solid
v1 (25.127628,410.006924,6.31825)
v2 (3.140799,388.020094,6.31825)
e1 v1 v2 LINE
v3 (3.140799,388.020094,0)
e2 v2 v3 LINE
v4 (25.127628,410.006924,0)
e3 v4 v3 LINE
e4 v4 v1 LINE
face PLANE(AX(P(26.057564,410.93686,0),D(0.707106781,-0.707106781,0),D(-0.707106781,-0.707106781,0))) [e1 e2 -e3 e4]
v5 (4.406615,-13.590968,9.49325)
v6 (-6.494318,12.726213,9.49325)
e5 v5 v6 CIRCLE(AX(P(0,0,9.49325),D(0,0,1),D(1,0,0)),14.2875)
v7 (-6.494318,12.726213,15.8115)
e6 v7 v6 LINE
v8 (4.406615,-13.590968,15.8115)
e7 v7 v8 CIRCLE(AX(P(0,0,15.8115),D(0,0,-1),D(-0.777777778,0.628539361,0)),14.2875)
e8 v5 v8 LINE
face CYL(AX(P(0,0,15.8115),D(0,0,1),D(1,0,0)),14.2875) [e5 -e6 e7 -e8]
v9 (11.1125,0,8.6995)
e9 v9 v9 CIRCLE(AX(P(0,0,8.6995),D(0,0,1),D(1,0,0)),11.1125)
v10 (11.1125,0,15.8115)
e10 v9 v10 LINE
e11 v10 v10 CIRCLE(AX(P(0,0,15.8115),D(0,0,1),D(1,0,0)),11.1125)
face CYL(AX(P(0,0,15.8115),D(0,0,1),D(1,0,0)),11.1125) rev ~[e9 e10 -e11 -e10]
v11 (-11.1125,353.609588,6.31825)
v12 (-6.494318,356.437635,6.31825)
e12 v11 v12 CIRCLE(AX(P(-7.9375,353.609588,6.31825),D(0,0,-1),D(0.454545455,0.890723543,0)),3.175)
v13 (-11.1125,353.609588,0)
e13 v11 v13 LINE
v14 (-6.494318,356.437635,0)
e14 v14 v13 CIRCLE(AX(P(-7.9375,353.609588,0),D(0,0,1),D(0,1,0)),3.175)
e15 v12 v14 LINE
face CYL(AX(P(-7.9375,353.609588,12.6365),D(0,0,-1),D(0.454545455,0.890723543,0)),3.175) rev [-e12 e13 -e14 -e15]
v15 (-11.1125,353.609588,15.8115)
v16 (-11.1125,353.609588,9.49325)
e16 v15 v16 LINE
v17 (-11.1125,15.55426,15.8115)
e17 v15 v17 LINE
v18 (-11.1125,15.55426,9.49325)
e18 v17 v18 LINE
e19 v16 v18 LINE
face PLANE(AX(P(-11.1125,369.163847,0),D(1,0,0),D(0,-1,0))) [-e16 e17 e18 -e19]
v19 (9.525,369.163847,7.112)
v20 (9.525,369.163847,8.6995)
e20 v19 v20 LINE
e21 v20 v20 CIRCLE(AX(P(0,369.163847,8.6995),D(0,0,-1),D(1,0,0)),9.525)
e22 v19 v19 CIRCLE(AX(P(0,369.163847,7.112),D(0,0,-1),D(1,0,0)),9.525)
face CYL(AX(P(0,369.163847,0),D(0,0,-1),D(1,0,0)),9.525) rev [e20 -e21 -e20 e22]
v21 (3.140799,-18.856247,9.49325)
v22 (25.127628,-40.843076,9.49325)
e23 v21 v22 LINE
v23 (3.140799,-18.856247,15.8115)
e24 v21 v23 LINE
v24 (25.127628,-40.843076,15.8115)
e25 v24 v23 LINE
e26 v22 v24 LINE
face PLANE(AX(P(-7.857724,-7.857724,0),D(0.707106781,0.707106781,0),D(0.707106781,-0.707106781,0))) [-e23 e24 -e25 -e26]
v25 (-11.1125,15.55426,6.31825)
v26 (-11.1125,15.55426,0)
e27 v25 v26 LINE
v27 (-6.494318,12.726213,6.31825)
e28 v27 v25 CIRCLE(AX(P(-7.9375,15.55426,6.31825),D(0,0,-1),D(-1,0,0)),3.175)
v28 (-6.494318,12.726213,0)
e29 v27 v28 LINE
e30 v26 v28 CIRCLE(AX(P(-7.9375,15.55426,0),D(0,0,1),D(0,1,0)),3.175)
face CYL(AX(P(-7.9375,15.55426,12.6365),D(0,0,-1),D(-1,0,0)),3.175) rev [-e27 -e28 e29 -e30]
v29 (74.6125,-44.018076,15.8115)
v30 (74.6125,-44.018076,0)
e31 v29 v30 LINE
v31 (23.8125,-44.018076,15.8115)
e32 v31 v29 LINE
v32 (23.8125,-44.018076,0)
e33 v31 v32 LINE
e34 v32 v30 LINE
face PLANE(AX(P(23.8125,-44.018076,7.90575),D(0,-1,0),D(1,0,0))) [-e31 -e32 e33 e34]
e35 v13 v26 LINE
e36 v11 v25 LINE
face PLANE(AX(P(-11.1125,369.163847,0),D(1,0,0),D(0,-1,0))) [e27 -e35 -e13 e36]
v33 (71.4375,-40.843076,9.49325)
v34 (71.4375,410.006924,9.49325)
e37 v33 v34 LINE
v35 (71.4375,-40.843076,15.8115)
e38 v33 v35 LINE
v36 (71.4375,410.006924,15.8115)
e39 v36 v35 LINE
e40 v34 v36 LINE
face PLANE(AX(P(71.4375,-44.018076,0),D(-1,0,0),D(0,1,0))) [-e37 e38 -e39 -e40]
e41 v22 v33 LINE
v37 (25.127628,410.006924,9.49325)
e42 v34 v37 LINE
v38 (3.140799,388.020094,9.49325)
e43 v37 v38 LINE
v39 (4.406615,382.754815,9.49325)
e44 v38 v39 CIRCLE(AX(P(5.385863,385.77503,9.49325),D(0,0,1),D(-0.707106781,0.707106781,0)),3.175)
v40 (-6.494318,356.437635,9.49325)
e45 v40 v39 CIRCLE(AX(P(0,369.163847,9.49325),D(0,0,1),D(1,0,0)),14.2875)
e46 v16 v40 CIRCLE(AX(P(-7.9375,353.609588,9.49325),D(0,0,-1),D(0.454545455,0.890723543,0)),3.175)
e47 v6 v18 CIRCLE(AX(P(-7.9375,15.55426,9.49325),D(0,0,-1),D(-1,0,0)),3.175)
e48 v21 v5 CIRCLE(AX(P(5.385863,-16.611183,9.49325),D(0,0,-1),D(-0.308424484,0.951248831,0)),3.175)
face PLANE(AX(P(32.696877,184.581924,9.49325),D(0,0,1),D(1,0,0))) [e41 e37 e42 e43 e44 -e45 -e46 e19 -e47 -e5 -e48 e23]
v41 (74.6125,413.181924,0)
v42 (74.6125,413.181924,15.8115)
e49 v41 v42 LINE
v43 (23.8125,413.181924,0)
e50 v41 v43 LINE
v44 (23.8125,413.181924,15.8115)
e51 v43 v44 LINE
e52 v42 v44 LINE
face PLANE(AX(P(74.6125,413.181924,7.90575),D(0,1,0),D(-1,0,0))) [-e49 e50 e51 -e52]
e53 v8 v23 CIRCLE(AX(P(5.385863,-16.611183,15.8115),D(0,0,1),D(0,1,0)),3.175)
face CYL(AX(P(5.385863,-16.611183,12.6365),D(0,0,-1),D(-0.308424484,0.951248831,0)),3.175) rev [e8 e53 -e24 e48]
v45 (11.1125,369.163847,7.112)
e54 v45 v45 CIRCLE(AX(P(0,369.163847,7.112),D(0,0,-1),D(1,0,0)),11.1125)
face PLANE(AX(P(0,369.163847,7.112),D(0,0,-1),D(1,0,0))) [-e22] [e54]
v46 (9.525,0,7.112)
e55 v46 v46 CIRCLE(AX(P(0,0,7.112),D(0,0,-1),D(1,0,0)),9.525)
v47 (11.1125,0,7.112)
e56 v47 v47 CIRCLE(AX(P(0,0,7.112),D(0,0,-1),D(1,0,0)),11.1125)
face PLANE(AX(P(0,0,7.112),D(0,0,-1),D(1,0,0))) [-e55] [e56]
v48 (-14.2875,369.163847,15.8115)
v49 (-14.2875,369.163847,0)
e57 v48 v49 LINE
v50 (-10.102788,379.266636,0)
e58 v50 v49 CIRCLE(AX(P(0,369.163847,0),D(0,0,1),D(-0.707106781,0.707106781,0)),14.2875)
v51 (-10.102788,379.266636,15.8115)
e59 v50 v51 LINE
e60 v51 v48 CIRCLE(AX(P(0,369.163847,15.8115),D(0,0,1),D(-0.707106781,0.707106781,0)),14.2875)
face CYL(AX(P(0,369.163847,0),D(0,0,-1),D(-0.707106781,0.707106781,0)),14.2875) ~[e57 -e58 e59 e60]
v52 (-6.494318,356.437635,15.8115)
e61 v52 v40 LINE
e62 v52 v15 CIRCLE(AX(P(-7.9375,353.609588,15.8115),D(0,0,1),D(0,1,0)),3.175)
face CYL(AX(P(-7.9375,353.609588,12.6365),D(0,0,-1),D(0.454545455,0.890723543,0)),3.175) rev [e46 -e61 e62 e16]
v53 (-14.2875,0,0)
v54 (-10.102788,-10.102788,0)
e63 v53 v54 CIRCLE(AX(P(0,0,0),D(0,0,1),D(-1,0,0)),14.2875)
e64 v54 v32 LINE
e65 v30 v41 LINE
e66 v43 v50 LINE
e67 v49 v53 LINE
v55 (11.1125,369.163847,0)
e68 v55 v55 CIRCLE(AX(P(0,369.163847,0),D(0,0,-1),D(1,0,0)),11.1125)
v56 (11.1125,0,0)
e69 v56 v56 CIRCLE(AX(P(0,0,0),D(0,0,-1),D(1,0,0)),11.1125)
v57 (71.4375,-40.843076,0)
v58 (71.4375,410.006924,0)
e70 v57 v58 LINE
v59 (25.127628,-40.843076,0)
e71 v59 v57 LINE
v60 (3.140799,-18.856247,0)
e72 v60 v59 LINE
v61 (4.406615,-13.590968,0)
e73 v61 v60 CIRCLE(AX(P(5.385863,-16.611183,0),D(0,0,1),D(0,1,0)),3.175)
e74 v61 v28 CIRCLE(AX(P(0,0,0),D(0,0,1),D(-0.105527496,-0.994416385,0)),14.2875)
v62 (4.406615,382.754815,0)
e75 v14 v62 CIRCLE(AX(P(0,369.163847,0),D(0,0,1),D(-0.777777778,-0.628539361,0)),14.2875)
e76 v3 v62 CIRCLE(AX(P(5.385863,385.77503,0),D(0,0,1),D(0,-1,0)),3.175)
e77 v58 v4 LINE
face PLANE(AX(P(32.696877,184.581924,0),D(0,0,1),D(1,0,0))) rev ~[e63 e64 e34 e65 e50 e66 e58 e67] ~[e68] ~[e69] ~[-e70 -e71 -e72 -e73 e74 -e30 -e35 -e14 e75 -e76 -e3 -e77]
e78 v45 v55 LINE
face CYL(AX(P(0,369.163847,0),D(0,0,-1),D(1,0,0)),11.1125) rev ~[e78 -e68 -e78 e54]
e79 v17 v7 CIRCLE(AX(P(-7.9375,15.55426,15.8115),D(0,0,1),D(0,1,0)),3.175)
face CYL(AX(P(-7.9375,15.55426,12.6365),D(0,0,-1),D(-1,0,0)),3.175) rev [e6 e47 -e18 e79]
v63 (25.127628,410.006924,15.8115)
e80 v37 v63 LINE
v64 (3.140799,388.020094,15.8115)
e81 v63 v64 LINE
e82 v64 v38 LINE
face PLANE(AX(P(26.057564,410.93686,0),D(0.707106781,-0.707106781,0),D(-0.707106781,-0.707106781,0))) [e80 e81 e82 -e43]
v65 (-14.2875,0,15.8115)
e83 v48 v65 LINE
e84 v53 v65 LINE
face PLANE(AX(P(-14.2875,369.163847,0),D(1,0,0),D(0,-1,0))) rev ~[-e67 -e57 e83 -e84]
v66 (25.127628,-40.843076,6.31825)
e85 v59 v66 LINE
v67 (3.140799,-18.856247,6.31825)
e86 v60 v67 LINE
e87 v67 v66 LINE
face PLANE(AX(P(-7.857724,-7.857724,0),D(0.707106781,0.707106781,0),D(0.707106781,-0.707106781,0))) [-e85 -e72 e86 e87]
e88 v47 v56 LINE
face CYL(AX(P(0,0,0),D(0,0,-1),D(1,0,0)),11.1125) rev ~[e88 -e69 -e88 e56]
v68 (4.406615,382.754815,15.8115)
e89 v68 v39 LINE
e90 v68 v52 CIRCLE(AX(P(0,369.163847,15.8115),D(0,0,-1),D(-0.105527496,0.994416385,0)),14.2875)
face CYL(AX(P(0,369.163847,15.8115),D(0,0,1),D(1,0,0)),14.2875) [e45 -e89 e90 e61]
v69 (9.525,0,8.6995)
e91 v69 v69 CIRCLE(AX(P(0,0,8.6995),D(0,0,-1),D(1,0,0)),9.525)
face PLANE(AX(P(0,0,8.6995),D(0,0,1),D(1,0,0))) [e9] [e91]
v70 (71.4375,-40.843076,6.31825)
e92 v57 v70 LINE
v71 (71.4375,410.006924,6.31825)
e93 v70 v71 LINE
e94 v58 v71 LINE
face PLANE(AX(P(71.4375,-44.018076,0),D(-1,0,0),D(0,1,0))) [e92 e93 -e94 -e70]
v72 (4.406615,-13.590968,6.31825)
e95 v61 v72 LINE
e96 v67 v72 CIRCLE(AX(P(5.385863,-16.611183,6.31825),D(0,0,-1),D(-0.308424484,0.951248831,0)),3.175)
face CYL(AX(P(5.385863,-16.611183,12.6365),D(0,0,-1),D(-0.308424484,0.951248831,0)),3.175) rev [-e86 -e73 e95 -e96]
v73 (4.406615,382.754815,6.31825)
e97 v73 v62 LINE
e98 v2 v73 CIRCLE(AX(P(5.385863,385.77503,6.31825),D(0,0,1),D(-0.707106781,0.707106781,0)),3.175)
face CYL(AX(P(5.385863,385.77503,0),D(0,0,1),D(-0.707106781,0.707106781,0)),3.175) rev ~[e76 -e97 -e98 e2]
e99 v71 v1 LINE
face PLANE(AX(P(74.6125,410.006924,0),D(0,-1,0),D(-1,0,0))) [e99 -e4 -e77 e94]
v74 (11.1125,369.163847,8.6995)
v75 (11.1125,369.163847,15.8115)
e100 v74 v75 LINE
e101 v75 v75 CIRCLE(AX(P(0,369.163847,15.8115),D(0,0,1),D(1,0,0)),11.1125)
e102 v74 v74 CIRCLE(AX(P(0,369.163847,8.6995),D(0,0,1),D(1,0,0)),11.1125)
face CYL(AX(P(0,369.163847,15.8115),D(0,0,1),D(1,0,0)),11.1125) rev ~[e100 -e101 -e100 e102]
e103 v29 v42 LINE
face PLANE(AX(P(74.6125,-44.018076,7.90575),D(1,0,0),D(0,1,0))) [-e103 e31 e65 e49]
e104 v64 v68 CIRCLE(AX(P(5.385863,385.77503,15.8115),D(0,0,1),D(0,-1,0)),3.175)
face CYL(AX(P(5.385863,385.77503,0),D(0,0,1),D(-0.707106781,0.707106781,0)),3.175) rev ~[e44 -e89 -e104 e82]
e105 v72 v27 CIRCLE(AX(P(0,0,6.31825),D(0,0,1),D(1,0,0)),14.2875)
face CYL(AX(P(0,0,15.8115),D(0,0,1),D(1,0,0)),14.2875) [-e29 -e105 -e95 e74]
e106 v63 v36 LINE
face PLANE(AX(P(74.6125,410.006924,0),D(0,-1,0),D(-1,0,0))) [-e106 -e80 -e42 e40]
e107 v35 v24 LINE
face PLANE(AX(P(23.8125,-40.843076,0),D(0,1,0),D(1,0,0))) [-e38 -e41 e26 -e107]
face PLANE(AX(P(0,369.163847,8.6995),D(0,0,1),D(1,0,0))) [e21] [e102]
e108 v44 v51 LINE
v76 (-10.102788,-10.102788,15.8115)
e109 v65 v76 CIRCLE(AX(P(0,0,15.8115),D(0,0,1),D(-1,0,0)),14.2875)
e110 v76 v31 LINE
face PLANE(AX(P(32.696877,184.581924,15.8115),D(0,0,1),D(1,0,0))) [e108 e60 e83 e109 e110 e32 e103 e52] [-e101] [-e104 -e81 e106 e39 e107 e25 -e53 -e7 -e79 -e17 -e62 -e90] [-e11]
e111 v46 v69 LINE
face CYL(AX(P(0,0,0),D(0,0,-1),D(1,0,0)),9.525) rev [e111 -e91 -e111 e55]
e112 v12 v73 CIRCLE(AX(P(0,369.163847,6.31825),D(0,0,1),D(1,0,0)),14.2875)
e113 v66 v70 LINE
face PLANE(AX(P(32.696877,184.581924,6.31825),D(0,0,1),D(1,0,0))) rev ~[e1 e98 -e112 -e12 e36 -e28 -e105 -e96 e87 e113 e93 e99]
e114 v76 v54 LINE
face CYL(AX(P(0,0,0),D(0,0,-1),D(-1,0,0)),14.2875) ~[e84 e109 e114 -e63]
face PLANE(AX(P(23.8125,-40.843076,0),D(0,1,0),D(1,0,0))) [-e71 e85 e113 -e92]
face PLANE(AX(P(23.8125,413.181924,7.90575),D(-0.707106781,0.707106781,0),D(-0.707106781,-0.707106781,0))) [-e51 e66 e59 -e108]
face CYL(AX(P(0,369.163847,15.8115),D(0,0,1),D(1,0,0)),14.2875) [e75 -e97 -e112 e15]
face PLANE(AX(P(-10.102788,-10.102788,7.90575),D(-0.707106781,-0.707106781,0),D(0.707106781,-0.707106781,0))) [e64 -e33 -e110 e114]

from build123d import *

# Parameters (mm, degrees)
F0_R      = 9.525
F1_DEPTH  = 15.8115
F2_R      = 11.1125
F3_DEPTH  = 7.112
F4_R      = 11.1125
F5_DEPTH  = 7.112
F6_T      = 3.175
F7_R      = 3.175
F8_DEPTH  = 3.175
F10_R     = 11.1125
F11_DEPTH = 1.5875


# Not quite as in the source:
# - a shell that OpenCascade refuses in one call is made with other operations: the cavity is built on its own and cut out


with BuildPart() as f1:
    # F0 (on Top) → F1 (new body)
    with BuildSketch(Plane.XY):
        with BuildLine():
            Line((-14.2875, 369.1638474552), (-14.2875, 0))
            ThreePointArc((-14.2875, 0), (-13.1999288208, -5.4675895399), (-10.1027881362, -10.1027881362))
            Line((-10.1027881362, -10.1027881362), (23.8125, -44.0180762724))
            Line((23.8125, -44.0180762724), (74.6125, -44.0180762724))
            Line((74.6125, -44.0180762724), (74.6125, 413.1819237276))
            Line((74.6125, 413.1819237276), (23.8125, 413.1819237276))
            Line((23.8125, 413.1819237276), (-10.1027881362, 379.2666355914))
            ThreePointArc((-10.1027881362, 379.2666355914), (-13.1999288208, 374.6314369951), (-14.2875, 369.1638474552))
        make_face()
        Circle(F0_R, mode=Mode.SUBTRACT)
        with Locations((0, 369.1638474552)):
            Circle(F0_R, mode=Mode.SUBTRACT)
    extrude(amount=F1_DEPTH)

    # F2 (on face) → F3 (cut)
    with BuildSketch(Plane.XY.offset(15.8115)):
        with Locations((0, 369.1638474552)):
            Circle(F2_R)
        Circle(F2_R)
    extrude(amount=-F3_DEPTH, mode=Mode.SUBTRACT)

    # F4 (on face) → F5 (cut)
    with BuildSketch(Plane(origin=(0, 0, 0), x_dir=(1, 0, 0), z_dir=(0, 0, -1))):
        Circle(F4_R)
        with Locations((0, -369.1638474552)):
            Circle(F4_R)
    extrude(amount=-F5_DEPTH, mode=Mode.SUBTRACT)

    # F6: shell of thickness 3.175, made by hand


with BuildPart() as f6_core1:
    # F6_t2: copy of F1
    add(f1.part)

    # the walls: a layer under each face that stays
    f6_faces = [f6_core1.faces().sort_by_distance(p)[0] for p in [
        (-13.1999288208, 374.6314369951, 7.90575),
        (6.8548559319, 396.2242796595, 7.90575),
        (-14.2875, 184.5819237276, 7.90575),
        (30.1625, 184.5819237276, 15.8115),
        (49.2125, 413.1819237276, 7.90575),
        (-13.1999288208, -5.4675895399, 7.90575),
        (74.6125, 184.5819237276, 7.90575),
        (6.8548559319, -27.0604322043, 7.90575),
        (49.2125, -44.0180762724, 7.90575),
        (-11.1125, 0, 3.556),
        (-11.1125, 369.1638474552, 3.556),
        (-11.1125, 0, 12.2555),
        (-11.1125, 369.1638474552, 12.2555),
        (-7.4083333333, 7.4083333333, 7.112),
        (-7.4083333333, 376.5721807885, 7.112),
        (-7.4083333333, -7.4083333333, 8.6995),
        (-7.4083333333, 361.7555141219, 8.6995),
        (-9.525, 0, 7.90575),
        (-9.525, 369.1638474552, 7.90575),
    ]]
    thicken(f6_faces, amount=-F6_T, mode=Mode.SUBTRACT)

    # F6_s3 → F6_t4 (revolve, cut)
    with BuildSketch(Plane.XZ):
        Polygon((11.08075, 7.08025), (14.2875, 7.112), (14.2875, 10.287), (11.1125, 10.287), align=None)
    revolve(axis=Axis((0, 0, 7.112), (0, 0, -1)), mode=Mode.SUBTRACT)

    # F6_s5 → F6_t6 (revolve, cut)
    with BuildSketch(Plane.XZ.offset(-369.1638474552)):
        Polygon((11.08075, 7.08025), (14.2875, 7.112), (14.2875, 10.287), (11.1125, 10.287), align=None)
    revolve(axis=Axis((0, 369.1638474552, 7.112), (0, 0, -1)), mode=Mode.SUBTRACT)

    # F6_s7 → F6_t8 (revolve, cut)
    with BuildSketch(Plane.XZ):
        Polygon((11.08075, 8.73125), (14.2875, 8.6995), (14.2875, 5.5245), (11.1125, 5.5245), align=None)
    revolve(axis=Axis((0, 0, 8.6995), (0, 0, 1)), mode=Mode.SUBTRACT)

    # F6_s9 → F6_t10 (revolve, cut)
    with BuildSketch(Plane.XZ.offset(-369.1638474552)):
        Polygon((11.08075, 8.73125), (14.2875, 8.6995), (14.2875, 5.5245), (11.1125, 5.5245), align=None)
    revolve(axis=Axis((0, 369.1638474552, 8.6995), (0, 0, 1)), mode=Mode.SUBTRACT)


with BuildPart() as f1_1:
    add(f1.part)

    # what is left inside the walls is the cavity
    f6_cavity = [f6_core1.part.solids().sort_by_distance(p)[0] for p in [
        (30.1625, 109.440257, 12.60475),
    ]]
    add(f6_cavity, mode=Mode.SUBTRACT)

    # F7
    f7_edges = [f1_1.edges().sort_by_distance(p)[0] for p in [
        (-1.507724, 383.371572, 6.31825),
        (-11.1125, 360.183591, 6.31825),
        (-11.1125, 8.980256, 6.31825),
        (-1.507724, -14.207724, 6.31825),
    ]]
    fillet(f7_edges, radius=F7_R)

    # F8 (cut, through all): a face of the model
    f8_faces = [f1_1.faces().sort_by_distance(p)[0] for p in [
        (32.2546535053, 184.5819237276, 12.6365),
    ]]
    extrude(f8_faces, amount=-F8_DEPTH, mode=Mode.SUBTRACT)

    # F10 (on offset) → F11 (join, symmetric)
    with BuildSketch(Plane.XY.offset(7.90575)):
        with BuildLine():
            Line((74.6125, -44.0180762724), (74.6125, 413.1819237276))
            Line((74.6125, 413.1819237276), (23.8125, 413.1819237276))
            Line((23.8125, 413.1819237276), (-10.1027881362, 379.2666355914))
            ThreePointArc((-10.1027881362, 379.2666355914), (-13.1999288208, 374.6314369951), (-14.2875, 369.1638474552))
            Line((-14.2875, 369.1638474552), (-14.2875, 0))
            ThreePointArc((-14.2875, 0), (-13.1999288208, -5.4675895399), (-10.1027881362, -10.1027881362))
            Line((-10.1027881362, -10.1027881362), (23.8125, -44.0180762724))
            Line((23.8125, -44.0180762724), (74.6125, -44.0180762724))
        make_face()
        Circle(F10_R, mode=Mode.SUBTRACT)
        with Locations((0, 369.1638474552)):
            Circle(F10_R, mode=Mode.SUBTRACT)
    extrude(amount=F11_DEPTH, both=True)


solid = f1_1.part
